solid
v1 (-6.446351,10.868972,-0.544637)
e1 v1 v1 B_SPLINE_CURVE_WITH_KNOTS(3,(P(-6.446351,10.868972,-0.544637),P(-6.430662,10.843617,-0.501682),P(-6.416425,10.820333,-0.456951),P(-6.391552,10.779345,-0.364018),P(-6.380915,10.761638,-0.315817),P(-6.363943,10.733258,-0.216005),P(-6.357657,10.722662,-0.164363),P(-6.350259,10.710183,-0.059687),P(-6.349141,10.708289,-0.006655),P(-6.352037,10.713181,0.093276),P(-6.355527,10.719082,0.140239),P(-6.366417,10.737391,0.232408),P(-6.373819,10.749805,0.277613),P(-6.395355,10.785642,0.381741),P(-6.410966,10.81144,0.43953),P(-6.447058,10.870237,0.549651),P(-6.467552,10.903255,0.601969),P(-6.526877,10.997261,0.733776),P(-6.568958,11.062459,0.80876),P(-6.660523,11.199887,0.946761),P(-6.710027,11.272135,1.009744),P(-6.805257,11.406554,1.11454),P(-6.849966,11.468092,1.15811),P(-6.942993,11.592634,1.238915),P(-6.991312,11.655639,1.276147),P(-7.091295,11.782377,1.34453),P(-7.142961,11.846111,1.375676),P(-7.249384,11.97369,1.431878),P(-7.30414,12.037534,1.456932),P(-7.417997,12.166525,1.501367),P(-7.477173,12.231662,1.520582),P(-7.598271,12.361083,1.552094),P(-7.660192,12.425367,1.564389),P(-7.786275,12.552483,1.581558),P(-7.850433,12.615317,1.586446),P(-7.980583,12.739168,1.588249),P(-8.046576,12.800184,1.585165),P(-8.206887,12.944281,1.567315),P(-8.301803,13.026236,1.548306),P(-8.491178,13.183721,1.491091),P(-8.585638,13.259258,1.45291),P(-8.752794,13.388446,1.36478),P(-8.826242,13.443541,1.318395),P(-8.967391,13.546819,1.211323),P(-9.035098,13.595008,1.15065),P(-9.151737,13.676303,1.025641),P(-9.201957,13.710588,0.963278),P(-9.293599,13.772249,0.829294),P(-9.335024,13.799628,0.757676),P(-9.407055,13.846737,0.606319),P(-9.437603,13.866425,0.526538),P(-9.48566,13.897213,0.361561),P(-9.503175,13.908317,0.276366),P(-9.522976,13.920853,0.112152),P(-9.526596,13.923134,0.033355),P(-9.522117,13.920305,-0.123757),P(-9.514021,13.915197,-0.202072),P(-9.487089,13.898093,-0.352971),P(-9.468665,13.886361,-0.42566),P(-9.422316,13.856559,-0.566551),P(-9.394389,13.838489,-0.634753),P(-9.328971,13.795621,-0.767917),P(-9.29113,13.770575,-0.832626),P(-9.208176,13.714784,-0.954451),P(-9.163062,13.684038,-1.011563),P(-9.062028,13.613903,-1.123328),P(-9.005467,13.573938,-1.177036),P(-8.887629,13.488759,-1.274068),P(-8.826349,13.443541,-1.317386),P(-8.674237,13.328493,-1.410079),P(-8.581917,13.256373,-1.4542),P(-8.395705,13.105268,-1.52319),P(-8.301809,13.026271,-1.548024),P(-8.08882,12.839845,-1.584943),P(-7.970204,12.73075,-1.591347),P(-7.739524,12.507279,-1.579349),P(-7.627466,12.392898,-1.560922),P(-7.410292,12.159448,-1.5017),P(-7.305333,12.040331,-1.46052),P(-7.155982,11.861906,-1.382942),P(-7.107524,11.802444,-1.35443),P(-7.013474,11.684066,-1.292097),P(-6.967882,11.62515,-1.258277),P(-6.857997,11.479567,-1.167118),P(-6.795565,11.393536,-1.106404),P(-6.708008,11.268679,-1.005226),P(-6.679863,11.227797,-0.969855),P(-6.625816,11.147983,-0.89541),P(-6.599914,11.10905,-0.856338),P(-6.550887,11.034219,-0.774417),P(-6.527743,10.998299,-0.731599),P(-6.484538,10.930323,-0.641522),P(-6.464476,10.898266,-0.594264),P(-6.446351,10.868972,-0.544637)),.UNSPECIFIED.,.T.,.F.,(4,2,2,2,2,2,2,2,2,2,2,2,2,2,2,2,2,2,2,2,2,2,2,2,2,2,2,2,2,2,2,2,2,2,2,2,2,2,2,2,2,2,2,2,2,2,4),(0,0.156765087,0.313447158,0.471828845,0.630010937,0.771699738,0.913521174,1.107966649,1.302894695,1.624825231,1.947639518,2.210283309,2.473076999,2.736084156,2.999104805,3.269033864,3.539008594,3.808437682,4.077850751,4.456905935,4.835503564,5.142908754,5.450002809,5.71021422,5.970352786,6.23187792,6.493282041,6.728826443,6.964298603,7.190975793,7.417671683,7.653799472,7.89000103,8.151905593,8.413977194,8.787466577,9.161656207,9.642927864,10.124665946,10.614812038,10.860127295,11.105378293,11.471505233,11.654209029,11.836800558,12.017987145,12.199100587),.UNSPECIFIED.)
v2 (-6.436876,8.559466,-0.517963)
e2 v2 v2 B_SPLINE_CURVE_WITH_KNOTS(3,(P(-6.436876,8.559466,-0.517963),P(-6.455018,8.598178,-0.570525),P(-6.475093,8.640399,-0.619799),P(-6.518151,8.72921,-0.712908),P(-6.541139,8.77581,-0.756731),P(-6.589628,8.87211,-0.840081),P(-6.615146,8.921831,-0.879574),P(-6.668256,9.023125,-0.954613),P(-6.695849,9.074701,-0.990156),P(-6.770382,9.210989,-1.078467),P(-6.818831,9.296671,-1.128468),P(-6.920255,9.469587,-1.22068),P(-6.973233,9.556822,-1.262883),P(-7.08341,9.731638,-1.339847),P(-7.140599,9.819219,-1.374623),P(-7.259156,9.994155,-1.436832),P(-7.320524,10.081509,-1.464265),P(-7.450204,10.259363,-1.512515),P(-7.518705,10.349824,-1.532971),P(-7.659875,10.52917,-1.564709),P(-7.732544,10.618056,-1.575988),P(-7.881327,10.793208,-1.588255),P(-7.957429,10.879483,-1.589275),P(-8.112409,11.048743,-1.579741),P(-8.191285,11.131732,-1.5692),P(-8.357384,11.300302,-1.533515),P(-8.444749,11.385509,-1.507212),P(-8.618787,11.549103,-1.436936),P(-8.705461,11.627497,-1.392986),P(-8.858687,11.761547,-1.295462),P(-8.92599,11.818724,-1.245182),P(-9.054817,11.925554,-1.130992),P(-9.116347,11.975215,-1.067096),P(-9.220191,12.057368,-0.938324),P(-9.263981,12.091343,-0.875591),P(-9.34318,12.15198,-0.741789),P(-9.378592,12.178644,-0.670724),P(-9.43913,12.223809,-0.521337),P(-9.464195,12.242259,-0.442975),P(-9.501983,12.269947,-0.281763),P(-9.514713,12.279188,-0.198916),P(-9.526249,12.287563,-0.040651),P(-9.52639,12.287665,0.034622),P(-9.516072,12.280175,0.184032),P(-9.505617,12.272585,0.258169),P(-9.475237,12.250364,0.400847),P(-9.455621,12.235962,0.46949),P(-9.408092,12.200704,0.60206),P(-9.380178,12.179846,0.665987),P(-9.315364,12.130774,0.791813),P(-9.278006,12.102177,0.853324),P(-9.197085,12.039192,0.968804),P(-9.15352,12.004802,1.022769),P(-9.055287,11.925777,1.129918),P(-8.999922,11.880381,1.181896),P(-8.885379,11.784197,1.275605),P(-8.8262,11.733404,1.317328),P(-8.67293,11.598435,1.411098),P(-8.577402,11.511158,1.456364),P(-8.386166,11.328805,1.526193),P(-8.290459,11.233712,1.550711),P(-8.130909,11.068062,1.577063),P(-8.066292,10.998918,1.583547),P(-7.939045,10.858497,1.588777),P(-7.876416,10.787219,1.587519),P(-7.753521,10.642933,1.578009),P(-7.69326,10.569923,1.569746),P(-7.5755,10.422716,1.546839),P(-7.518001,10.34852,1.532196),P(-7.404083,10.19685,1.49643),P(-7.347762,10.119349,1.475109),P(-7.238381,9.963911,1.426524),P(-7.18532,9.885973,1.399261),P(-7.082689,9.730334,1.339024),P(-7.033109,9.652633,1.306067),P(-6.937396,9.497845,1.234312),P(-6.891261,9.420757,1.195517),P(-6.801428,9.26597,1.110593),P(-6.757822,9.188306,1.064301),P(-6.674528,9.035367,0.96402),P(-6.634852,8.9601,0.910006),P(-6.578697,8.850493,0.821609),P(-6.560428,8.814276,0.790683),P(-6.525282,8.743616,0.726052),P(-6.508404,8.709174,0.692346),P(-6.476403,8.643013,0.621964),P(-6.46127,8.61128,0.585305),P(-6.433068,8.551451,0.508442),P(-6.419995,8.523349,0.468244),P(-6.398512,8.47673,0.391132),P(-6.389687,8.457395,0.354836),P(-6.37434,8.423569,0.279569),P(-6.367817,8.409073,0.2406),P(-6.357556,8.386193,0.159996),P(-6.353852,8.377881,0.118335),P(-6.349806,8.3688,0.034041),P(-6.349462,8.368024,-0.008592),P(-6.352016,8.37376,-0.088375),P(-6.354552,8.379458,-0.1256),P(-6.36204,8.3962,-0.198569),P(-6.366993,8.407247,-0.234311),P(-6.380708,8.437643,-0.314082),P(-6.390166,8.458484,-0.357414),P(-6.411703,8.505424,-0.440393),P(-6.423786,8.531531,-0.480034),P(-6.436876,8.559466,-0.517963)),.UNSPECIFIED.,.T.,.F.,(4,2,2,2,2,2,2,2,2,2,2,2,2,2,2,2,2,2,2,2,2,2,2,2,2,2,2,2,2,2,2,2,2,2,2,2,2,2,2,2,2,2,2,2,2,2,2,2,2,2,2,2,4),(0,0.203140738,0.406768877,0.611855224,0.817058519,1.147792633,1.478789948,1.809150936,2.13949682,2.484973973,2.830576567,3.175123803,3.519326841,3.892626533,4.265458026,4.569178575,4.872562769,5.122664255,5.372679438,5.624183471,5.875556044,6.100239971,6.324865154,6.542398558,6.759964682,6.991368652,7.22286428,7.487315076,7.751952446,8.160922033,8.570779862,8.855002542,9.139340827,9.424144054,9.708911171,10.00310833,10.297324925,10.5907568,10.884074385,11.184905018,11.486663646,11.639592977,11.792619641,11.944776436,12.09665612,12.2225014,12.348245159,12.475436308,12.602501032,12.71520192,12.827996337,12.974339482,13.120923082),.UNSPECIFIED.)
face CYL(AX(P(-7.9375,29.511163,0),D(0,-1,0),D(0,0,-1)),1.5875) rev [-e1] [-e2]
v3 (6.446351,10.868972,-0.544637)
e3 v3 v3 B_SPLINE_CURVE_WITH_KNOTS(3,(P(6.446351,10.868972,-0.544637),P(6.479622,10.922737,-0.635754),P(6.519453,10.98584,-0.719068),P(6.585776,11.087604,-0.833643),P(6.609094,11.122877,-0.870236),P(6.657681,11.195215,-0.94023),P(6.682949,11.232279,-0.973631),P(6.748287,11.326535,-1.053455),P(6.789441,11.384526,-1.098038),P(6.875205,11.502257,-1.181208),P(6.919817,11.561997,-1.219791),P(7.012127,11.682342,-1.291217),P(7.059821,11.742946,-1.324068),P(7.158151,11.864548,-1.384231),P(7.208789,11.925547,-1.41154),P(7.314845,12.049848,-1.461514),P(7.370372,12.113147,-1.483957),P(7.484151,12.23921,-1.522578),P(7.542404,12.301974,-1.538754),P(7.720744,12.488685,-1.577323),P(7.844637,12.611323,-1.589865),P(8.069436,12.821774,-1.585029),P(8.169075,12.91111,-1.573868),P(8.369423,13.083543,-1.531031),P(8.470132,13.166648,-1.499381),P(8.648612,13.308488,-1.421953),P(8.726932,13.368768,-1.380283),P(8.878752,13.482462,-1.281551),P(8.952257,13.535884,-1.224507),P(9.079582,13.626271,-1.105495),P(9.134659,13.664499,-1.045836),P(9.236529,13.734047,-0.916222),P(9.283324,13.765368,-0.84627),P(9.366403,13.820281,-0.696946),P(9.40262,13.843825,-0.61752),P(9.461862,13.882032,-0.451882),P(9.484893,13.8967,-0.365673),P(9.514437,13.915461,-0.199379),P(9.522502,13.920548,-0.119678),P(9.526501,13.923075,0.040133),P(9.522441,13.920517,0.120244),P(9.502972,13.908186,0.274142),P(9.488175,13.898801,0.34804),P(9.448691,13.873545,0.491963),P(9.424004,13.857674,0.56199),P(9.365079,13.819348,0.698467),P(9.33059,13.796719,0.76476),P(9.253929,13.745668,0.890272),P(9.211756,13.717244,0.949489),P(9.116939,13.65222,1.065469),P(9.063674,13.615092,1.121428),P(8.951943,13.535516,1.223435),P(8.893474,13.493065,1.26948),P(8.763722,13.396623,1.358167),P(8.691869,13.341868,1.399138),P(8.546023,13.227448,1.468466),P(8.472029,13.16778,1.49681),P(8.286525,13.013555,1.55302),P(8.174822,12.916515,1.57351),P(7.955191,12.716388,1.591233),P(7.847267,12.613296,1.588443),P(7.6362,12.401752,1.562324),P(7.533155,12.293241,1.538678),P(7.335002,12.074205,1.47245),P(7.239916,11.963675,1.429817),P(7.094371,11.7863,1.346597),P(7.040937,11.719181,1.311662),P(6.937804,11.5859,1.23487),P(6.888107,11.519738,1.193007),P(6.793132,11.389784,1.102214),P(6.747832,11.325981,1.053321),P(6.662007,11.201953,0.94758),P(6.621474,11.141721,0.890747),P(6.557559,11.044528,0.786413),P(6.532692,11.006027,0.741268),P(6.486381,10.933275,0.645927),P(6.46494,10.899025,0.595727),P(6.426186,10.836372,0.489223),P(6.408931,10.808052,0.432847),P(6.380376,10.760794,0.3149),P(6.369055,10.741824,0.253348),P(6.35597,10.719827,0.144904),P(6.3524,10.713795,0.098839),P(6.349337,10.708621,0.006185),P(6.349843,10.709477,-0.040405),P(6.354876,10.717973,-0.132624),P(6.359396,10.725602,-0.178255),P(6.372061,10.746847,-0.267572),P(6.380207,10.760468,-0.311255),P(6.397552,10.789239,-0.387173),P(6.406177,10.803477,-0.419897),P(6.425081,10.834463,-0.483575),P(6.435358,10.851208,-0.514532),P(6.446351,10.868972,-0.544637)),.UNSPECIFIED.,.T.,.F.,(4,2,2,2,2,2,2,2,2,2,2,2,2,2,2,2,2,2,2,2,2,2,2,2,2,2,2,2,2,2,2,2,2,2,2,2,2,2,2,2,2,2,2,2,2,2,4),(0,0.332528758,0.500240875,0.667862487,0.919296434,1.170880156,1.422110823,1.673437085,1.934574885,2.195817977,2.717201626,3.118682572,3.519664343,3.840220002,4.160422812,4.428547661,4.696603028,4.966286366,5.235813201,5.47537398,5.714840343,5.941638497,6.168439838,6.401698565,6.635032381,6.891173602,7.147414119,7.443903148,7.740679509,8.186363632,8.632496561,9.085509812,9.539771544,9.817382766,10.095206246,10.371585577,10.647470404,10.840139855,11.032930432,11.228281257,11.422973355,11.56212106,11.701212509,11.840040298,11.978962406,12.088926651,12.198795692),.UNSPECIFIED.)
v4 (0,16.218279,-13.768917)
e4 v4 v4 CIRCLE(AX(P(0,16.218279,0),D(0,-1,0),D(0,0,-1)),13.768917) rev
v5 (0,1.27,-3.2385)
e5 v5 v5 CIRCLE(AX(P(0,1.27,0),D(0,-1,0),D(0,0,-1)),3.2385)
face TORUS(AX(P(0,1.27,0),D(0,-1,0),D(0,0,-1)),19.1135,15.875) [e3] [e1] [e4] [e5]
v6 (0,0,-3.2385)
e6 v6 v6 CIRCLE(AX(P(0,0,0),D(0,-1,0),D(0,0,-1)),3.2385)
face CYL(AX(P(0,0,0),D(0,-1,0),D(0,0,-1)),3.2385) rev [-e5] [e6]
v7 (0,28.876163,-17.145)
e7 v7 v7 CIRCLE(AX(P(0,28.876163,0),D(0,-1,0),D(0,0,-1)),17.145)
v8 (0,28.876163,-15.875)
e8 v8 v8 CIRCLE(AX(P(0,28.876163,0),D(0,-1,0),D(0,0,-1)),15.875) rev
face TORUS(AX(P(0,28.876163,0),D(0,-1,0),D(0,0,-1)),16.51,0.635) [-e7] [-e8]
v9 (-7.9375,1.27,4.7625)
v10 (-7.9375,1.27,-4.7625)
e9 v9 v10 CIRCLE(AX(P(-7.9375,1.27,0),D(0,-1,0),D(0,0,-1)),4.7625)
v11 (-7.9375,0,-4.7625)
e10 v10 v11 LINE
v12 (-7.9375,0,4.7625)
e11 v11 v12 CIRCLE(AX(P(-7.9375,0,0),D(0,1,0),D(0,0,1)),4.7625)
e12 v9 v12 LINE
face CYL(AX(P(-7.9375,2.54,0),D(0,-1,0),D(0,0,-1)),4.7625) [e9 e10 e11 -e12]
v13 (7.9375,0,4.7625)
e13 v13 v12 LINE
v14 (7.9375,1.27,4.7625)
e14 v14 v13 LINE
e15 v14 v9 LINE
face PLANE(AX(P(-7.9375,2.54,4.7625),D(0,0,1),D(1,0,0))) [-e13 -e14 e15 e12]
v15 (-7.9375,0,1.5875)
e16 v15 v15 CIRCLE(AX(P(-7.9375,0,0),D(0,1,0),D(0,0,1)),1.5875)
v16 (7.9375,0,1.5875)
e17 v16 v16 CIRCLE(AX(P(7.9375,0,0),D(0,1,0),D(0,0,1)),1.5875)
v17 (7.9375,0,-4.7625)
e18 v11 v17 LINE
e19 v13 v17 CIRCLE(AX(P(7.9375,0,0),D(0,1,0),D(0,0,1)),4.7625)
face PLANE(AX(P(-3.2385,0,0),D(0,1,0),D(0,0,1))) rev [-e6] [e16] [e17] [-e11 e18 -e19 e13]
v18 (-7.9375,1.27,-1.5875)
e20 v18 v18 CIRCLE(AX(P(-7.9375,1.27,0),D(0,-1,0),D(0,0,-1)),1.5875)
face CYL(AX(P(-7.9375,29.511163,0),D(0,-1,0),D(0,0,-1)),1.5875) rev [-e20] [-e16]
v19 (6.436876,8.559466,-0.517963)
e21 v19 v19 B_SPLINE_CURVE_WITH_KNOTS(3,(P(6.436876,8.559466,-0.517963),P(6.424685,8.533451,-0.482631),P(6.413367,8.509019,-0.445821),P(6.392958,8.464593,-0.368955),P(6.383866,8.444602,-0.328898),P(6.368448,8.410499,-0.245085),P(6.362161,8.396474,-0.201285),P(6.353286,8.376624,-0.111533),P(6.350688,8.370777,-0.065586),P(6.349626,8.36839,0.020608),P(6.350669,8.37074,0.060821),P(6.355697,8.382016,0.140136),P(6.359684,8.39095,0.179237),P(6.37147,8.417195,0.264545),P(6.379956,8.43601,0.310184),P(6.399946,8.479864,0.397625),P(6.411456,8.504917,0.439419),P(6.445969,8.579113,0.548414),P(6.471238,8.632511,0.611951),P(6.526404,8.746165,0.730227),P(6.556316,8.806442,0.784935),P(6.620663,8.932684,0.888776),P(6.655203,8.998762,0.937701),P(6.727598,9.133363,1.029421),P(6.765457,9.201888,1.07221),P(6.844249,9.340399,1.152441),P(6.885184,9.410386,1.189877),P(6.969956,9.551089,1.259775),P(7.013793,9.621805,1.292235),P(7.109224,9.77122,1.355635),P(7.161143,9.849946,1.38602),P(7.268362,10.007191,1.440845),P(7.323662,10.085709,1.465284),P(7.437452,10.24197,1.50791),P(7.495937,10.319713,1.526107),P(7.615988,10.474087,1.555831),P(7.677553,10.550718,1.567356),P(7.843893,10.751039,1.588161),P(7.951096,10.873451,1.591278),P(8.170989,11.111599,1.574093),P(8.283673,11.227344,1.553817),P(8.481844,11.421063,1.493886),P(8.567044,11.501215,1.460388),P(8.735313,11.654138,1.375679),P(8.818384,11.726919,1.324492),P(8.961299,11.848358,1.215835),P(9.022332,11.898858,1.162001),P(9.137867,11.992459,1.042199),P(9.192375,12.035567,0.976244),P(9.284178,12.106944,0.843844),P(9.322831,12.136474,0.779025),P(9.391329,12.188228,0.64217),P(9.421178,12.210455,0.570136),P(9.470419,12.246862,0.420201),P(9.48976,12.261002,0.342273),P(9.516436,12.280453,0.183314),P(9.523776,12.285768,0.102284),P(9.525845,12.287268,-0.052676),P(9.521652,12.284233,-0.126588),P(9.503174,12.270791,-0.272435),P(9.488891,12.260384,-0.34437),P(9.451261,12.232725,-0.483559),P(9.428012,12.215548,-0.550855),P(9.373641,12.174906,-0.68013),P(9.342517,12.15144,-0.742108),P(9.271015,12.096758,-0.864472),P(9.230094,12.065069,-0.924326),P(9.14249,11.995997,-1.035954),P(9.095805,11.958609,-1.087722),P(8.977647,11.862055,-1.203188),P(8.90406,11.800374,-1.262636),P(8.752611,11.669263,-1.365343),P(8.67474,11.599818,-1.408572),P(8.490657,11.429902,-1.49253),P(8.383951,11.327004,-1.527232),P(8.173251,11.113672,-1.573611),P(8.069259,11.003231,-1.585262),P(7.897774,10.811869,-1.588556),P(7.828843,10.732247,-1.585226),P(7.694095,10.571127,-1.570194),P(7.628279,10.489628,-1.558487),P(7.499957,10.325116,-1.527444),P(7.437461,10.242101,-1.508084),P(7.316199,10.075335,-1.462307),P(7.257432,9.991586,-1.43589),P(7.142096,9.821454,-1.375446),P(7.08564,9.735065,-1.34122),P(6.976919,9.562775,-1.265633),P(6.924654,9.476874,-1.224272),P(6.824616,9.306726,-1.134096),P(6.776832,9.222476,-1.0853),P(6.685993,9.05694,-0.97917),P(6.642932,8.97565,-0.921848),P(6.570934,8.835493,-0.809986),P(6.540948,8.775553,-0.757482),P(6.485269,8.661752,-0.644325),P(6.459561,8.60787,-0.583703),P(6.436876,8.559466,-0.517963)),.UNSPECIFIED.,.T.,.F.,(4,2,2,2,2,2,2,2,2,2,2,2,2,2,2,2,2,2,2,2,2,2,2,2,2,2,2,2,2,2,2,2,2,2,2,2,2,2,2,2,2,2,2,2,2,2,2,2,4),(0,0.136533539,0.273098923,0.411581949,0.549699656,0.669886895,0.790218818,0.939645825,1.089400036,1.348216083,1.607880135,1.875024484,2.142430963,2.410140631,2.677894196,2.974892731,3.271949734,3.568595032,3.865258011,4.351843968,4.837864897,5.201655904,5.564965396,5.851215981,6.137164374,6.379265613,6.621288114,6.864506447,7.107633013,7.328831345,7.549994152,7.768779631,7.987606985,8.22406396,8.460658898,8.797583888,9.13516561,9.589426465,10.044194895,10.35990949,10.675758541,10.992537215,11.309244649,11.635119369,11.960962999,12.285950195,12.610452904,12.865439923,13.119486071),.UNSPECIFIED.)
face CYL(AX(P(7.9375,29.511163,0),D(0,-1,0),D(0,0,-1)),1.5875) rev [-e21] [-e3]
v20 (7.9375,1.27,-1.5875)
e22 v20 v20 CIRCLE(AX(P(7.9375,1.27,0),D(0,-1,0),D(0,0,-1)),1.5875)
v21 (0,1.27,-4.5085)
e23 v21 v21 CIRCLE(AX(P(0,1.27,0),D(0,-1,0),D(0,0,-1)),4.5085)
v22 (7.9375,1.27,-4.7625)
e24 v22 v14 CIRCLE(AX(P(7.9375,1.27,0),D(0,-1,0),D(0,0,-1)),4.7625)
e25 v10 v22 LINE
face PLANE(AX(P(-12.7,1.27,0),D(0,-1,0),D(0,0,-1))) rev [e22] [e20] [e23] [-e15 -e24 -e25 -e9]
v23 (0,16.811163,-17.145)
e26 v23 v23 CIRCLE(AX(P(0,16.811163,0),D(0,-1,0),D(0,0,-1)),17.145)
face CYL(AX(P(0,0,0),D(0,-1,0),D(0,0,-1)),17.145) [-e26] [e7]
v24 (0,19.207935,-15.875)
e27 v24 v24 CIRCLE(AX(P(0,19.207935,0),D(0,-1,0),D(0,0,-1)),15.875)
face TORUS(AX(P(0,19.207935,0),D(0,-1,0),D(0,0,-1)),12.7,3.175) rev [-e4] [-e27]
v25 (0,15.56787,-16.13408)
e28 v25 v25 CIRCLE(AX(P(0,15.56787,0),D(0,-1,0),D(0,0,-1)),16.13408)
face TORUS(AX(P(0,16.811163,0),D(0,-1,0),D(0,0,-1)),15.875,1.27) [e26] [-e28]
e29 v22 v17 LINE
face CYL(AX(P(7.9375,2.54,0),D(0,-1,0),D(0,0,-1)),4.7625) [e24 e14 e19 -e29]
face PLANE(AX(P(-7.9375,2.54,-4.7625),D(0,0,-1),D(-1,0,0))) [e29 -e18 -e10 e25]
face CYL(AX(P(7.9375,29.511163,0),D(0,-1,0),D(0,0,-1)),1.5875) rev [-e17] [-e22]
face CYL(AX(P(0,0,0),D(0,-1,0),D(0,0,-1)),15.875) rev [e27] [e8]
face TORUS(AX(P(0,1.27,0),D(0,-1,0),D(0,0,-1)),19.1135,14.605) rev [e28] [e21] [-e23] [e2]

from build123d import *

# Parameters (mm, degrees)
FILLET1_R               = 0.635
FILLET2_R               = 3.175
CUT_EXTRUDE1_DEPTH      = 39.194381605
CUT_EXTRUDE1_DEPTH_BACK = 39.194381605
SKETCH2_R               = 1.5875
SKETCH3_OUTSIDE_W       = 47.644
SKETCH3_OUTSIDE_H       = 47.644
CUT_EXTRUDE2_DEPTH      = 2.54


with BuildPart() as part:
    # Sketch1 → Revolve1 (revolve)
    with BuildSketch(Plane.XY, mode=Mode.PRIVATE) as revolve1_sk:
        with BuildLine():
            Line((-3.2385, 0), (-12.7, 0))
            Line((-12.7, 0), (-12.7, 1.27))
            Line((-12.7, 1.27), (-4.5085, 1.27))
            ThreePointArc((-4.5085, 1.27), (-7.781676358, 10.483891575), (-16.13408, 15.567869823))
            ThreePointArc((-16.13408, 15.567869823), (-16.860375969, 16.009954888), (-17.145, 16.811162851))
            Line((-17.145, 16.811162851), (-17.145, 29.511162851))
            Line((-17.145, 29.511162851), (-15.875, 29.511162851))
            Line((-15.875, 29.511162851), (-15.875, 16.811162851))
            ThreePointArc((-15.875, 16.811162851), (-6.796300389, 11.285099538), (-3.2385, 1.27))
            Line((-3.2385, 1.27), (-3.2385, 0))
        make_face()
    revolve(revolve1_sk.sketch.rotate(Axis((0, 0, 0), (0, 1, 0)), 270), axis=Axis((0, 0, 0), (0, 1, 0)))

    # Fillet1
    fillet1_edges = [part.edges().sort_by_distance(p)[0] for p in [
        (0, 29.511162851, 17.145),
        (0, 29.511162851, 15.875),
    ]]
    fillet(fillet1_edges, radius=FILLET1_R - 0.0001)  # a hair under: the kernel refuses the full size

    # Fillet2
    fillet2_edges = [part.edges().sort_by_distance(p)[0] for p in [
        (0, 16.811162851, 15.875),
    ]]
    fillet(fillet2_edges, radius=FILLET2_R)

    # Sketch2 → Cut-Extrude1 (cut, two sides: drawn at the far end of the back side and taken through both)
    with BuildSketch(Plane.XZ.offset(-CUT_EXTRUDE1_DEPTH_BACK)):
        with Locations(Location((-7.9375, 0, 0), (0, 0, 270))):
            Circle(SKETCH2_R)
        with Locations(Location((7.9375, 0, 0), (0, 0, 270))):
            Circle(SKETCH2_R)
    extrude(amount=CUT_EXTRUDE1_DEPTH + CUT_EXTRUDE1_DEPTH_BACK, mode=Mode.SUBTRACT)

    # Sketch3 outside → Cut-Extrude2 (cut)
    with BuildSketch(Plane(origin=(0, 0, 0), x_dir=(-1, 0, 0), z_dir=(0, -1, 0))):
        Rectangle(SKETCH3_OUTSIDE_W, SKETCH3_OUTSIDE_H)
        with BuildLine():
            Line((7.9375, -4.7625), (-7.9375, -4.7625))
            ThreePointArc((-7.9375, -4.7625), (-12.7, 0), (-7.9375, 4.7625))
            Line((-7.9375, 4.7625), (7.9375, 4.7625))
            ThreePointArc((7.9375, 4.7625), (12.7, 0), (7.9375, -4.7625))
        make_face(mode=Mode.SUBTRACT)
    extrude(amount=-CUT_EXTRUDE2_DEPTH, mode=Mode.SUBTRACT)


solid = part.part
